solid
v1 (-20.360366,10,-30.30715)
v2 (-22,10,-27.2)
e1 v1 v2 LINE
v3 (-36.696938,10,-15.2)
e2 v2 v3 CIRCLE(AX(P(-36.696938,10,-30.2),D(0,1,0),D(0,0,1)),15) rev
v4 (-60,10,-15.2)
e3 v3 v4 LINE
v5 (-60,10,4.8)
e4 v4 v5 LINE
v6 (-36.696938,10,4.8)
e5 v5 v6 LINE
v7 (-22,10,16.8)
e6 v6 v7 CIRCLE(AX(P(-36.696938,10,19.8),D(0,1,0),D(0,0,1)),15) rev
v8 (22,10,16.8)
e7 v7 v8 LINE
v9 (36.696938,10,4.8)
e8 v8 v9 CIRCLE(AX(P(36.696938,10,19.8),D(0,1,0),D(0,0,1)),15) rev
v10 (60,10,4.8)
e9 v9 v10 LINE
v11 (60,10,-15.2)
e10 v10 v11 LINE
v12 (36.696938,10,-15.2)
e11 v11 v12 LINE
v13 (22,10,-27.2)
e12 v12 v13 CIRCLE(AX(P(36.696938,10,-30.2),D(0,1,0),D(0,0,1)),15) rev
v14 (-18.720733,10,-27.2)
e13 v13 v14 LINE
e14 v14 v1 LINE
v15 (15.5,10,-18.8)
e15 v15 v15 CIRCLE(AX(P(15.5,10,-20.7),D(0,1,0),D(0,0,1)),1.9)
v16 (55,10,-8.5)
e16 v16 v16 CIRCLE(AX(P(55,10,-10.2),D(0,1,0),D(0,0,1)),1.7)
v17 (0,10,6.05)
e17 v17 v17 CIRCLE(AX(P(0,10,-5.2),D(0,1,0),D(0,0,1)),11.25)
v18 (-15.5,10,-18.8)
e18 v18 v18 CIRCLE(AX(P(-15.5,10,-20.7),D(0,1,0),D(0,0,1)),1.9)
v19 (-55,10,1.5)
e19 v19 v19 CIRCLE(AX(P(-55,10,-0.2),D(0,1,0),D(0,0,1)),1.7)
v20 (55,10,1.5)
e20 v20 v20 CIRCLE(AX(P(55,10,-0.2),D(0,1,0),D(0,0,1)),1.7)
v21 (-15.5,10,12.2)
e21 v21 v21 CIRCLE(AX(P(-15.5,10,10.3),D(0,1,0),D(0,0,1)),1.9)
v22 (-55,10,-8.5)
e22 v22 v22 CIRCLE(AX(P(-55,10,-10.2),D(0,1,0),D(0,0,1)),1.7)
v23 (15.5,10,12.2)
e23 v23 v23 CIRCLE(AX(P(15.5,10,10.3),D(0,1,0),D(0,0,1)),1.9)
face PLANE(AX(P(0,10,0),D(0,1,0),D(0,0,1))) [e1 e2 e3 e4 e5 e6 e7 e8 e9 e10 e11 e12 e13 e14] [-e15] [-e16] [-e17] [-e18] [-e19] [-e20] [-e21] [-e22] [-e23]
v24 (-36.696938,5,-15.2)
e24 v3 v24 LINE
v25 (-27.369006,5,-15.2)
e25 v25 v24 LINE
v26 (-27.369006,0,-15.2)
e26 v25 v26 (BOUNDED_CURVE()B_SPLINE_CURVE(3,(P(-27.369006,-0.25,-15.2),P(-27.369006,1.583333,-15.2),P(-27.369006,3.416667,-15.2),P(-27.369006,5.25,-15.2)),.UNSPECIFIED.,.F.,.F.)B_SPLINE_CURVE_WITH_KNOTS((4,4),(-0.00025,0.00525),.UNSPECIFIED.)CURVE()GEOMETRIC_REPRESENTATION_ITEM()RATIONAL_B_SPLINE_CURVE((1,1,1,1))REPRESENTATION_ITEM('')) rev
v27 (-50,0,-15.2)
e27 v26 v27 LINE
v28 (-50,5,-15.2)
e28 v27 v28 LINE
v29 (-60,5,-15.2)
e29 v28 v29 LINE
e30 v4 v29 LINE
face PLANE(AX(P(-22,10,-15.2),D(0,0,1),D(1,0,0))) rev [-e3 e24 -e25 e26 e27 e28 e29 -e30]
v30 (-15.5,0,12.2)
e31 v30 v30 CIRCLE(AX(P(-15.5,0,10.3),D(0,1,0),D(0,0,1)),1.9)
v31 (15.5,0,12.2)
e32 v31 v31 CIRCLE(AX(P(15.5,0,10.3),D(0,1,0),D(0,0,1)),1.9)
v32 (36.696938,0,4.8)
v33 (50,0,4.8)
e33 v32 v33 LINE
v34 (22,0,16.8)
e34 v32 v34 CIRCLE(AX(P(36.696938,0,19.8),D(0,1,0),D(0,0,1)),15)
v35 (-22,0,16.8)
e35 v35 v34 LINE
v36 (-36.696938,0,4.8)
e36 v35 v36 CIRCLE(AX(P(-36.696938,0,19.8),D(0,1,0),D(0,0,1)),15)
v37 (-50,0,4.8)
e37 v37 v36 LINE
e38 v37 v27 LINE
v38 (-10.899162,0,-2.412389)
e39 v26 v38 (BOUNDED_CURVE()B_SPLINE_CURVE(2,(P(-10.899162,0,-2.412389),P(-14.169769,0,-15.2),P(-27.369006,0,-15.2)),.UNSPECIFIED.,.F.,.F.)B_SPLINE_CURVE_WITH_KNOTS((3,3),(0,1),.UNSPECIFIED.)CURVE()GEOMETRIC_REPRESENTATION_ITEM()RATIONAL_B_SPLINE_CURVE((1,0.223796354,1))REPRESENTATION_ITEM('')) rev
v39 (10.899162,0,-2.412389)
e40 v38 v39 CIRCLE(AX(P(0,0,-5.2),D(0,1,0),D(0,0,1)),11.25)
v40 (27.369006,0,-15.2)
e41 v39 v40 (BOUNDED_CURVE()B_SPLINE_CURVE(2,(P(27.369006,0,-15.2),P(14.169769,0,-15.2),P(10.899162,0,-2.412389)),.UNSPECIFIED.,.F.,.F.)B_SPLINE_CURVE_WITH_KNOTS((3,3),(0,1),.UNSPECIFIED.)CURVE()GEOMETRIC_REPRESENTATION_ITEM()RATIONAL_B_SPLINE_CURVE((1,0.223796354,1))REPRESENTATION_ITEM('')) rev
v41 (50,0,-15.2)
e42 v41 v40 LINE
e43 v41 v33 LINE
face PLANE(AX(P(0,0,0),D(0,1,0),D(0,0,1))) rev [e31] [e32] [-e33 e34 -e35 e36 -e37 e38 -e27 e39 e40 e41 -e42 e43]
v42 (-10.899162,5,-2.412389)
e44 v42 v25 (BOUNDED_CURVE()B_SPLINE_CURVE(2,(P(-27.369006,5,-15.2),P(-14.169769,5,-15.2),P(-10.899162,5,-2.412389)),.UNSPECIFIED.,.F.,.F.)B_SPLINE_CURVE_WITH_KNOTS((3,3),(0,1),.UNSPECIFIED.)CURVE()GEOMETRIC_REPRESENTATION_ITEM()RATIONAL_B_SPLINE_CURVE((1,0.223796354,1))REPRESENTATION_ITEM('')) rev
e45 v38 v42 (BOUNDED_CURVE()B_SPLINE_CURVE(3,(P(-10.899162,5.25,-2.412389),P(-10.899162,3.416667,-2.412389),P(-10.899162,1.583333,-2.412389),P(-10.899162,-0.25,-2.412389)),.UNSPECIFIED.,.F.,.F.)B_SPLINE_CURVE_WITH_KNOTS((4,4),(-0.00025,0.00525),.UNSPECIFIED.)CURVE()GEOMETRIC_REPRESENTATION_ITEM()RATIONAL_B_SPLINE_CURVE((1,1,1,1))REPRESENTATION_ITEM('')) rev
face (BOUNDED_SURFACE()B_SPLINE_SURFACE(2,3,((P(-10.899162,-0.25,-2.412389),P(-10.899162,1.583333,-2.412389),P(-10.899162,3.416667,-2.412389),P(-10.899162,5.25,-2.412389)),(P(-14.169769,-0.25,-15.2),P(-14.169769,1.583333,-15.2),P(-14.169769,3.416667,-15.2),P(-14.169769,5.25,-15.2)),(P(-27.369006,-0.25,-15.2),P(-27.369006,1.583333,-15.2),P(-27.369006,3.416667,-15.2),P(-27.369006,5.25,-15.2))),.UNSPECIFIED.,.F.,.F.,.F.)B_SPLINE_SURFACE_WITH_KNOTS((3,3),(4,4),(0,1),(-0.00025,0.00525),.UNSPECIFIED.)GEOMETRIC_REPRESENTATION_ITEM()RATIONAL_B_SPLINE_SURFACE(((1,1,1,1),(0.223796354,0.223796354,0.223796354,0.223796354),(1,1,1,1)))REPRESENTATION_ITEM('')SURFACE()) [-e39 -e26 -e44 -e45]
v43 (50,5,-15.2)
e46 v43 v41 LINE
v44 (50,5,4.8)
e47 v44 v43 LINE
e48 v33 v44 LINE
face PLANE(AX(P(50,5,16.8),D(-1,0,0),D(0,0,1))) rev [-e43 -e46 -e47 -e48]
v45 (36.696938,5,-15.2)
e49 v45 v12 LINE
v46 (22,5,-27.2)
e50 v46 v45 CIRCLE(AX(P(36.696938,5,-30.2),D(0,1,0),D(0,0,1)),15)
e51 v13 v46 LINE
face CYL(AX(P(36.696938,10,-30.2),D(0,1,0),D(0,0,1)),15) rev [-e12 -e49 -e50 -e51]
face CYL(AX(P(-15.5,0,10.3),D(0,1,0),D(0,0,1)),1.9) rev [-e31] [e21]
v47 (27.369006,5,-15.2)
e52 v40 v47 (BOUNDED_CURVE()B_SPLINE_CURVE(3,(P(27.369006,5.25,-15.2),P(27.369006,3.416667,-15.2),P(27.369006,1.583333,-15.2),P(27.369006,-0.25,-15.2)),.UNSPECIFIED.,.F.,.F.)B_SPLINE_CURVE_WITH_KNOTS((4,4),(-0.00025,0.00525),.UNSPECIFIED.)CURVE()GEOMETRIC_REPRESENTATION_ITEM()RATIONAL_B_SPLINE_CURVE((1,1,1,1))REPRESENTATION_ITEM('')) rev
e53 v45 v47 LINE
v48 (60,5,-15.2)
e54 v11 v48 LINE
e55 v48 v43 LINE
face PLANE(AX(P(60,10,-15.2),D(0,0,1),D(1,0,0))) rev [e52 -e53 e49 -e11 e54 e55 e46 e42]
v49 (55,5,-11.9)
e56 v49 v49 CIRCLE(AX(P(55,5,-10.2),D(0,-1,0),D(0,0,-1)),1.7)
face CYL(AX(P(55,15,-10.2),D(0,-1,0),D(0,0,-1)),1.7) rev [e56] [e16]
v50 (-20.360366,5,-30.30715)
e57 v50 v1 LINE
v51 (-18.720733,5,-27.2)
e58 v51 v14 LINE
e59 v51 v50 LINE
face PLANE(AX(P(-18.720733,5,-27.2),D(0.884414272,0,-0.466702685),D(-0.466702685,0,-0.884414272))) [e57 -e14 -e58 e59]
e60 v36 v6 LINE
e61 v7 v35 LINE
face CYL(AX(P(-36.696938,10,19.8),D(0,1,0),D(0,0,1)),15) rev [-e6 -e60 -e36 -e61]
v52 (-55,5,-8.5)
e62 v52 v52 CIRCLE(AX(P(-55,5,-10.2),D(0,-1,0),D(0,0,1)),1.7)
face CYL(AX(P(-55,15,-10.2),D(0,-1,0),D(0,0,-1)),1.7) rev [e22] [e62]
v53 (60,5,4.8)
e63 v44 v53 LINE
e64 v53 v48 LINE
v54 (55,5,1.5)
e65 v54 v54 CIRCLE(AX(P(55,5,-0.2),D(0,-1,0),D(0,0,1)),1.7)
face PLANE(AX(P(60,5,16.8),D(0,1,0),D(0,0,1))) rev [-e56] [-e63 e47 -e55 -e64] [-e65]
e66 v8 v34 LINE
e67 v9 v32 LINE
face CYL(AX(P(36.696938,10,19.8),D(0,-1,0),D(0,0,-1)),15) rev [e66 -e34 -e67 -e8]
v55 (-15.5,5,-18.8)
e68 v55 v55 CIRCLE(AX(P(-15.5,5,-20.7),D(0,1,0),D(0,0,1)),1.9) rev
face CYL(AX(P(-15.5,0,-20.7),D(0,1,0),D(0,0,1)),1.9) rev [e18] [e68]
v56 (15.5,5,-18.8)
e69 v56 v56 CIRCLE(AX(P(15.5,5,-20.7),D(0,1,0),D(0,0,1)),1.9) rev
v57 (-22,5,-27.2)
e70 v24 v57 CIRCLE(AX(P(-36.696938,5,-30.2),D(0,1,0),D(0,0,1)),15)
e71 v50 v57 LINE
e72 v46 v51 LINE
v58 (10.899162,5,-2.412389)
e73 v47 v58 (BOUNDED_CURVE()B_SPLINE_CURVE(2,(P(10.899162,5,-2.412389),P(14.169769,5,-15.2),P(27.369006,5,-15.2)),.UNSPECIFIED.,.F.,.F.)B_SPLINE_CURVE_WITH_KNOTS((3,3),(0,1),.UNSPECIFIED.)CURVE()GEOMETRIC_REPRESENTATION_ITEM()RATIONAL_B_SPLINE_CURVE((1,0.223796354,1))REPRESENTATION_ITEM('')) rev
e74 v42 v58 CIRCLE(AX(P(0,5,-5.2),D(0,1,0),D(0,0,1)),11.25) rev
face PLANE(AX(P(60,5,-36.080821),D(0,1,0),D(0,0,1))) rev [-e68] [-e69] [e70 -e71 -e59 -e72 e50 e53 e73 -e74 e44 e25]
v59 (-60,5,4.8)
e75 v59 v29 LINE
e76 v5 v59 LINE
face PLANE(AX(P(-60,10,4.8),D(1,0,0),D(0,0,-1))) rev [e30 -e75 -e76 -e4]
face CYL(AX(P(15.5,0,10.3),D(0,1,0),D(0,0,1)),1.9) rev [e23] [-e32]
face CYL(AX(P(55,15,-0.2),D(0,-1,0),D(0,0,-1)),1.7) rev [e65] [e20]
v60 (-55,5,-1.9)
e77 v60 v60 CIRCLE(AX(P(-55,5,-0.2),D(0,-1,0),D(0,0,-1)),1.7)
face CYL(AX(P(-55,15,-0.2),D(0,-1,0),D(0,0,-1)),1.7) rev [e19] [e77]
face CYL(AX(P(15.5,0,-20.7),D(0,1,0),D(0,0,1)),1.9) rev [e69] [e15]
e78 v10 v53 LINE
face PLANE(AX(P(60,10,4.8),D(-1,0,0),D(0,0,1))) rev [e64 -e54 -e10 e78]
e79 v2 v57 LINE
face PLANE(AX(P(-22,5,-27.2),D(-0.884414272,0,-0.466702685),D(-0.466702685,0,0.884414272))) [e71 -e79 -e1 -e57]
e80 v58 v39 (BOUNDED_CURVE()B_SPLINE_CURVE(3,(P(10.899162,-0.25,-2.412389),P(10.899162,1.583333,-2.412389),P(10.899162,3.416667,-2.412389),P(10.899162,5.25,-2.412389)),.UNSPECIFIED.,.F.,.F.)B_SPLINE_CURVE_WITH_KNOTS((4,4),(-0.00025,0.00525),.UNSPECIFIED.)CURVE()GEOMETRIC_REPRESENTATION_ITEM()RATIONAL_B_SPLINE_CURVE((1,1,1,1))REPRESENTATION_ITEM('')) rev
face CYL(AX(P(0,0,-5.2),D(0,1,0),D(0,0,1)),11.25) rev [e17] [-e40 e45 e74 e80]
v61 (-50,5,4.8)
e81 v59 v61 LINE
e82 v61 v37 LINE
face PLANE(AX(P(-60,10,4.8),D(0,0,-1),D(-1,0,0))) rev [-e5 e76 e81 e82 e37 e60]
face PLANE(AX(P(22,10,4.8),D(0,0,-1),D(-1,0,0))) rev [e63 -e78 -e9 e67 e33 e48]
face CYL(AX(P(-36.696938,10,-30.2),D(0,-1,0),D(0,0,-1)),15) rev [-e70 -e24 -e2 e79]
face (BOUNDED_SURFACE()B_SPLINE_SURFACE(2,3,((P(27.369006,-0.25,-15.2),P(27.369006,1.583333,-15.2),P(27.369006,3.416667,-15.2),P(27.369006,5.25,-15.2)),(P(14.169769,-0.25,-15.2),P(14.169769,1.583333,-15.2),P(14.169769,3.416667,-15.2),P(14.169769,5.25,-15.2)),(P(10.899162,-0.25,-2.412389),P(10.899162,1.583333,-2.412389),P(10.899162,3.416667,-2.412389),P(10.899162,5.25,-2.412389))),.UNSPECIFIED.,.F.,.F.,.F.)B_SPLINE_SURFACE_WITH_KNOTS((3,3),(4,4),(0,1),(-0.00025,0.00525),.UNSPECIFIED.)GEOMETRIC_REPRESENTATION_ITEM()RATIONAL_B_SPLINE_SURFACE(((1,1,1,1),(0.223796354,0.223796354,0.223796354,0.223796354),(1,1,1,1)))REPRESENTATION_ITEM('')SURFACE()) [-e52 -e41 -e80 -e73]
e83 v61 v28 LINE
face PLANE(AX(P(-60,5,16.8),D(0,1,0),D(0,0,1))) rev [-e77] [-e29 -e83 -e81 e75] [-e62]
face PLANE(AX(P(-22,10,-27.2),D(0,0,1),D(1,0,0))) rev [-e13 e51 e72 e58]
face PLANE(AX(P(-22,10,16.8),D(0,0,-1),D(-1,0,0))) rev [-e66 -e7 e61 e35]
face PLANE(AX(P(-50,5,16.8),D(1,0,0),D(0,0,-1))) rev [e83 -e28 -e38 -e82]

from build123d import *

# Parameters (mm, degrees)
AUFSATZ_LINEAR_AUSTRAGEN1_DEPTH      = 10
SKIZZE6_R                            = 1.9
SKIZZE6_R_2                          = 11.25
SCHNITT_LINEAR_AUSTRAGEN4_DEPTH      = 67.632124385
SKIZZE7_W                            = 20.880821379
SKIZZE7_H                            = 5
SCHNITT_LINEAR_AUSTRAGEN5_DEPTH      = 87.970339772
VERRUNDUNG3_R                        = 15
SCHNITT_LINEAR_AUSTRAGEN6_DEPTH      = 69.731361244
SCHNITT_LINEAR_AUSTRAGEN6_DEPTH_BACK = 69.731361244
SKIZZE8_W                            = 10
SKIZZE8_H                            = 5
SKIZZE9_R                            = 1.7
SCHNITT_LINEAR_AUSTRAGEN7_DEPTH      = 10
AUFSATZ_LINEAR_AUSTRAGEN2_DEPTH      = 5


with BuildPart() as part:
    # Skizze1 → Aufsatz-Linear austragen1 (new body)
    with BuildSketch(Plane(origin=(0, 0, 0), x_dir=(1, 0, 0), z_dir=(0, 1, 0))):
        Polygon((-60, -4.8), (-22, -4.8), (-22, -16.8), (22, -16.8), (22, -4.8), (60, -4.8), (60, 15.2), (22, 15.2), (22, 27.2), (0, 27.2), (-22, 27.2), (-22, 15.2), (-60, 15.2), align=None)
    extrude(amount=AUFSATZ_LINEAR_AUSTRAGEN1_DEPTH)

    # Skizze6 → Schnitt-Linear austragen4 (cut, through all)
    with BuildSketch(Plane(origin=(0, 10, 0), x_dir=(1, 0, 0), z_dir=(0, 1, 0))):
        with Locations(Location((15.5, 20.7, 0), (0, 0, 270))):
            Circle(SKIZZE6_R)
        with Locations(Location((15.5, -10.3, 0), (0, 0, 270))):
            Circle(SKIZZE6_R)
        with Locations(Location((-15.5, -10.3, 0), (0, 0, 270))):
            Circle(SKIZZE6_R)
        with Locations(Location((-15.5, 20.7, 0), (0, 0, 270))):
            Circle(SKIZZE6_R)
        with Locations(Location((0, 5.2, 0), (0, 0, 270))):
            Circle(SKIZZE6_R_2)
    extrude(amount=-SCHNITT_LINEAR_AUSTRAGEN4_DEPTH, mode=Mode.SUBTRACT)

    # Skizze7 → Schnitt-Linear austragen5 (cut, through all)
    with BuildSketch(Plane.ZY.offset(22)):
        with Locations((-25.64041069, 2.5)):
            Rectangle(SKIZZE7_W, SKIZZE7_H)
    extrude(amount=-SCHNITT_LINEAR_AUSTRAGEN5_DEPTH, mode=Mode.SUBTRACT)

    # Verrundung3
    # the kernel refuses this fillet: 15 mm, written as the material it adds along each edge
    with BuildSketch(Plane(origin=(-22, 5, -15.2), x_dir=(0, 0, -1), z_dir=(0, 1, 0))) as verrundung3_piece_1:
        with BuildLine():
            CenterArc((15, 14.696938457), VERRUNDUNG3_R, 180, 78.463040967)
            Line((0, 14.696938457), (-0.3, 14.696938457))
            Line((-0.3, 14.696938457), (-0.3, 0))
            Line((-0.3, 0), (0, -0.3))
            ThreePointArc((0, -0.3), (6, -0.3), (11.94, -0.293938769))
            Line((11.94, -0.293938769), (12, 0))
        make_face()
    extrude(amount=5)
    with BuildSketch(Plane(origin=(-22, 0, 4.8), x_dir=(-1, 0, 0), z_dir=(0, 1, 0))) as verrundung3_piece_2:
        with BuildLine():
            CenterArc((14.696938457, 15), VERRUNDUNG3_R, 191.536959033, 78.463040967)
            Line((0, 12), (-0.293938769, 11.94))
            ThreePointArc((-0.293938769, 11.94), (-0.3, 6), (-0.3, 0))
            Line((-0.3, 0), (0, -0.3))
            Line((0, -0.3), (14.696938457, -0.3))
            Line((14.696938457, -0.3), (14.696938457, 0))
        make_face()
    extrude(amount=10)
    with BuildSketch(Plane(origin=(22, 0, 4.8), x_dir=(1, 0, 0), z_dir=(0, 1, 0))) as verrundung3_piece_3:
        with BuildLine():
            CenterArc((14.696938457, -15), VERRUNDUNG3_R, 90, 78.463040967)
            Line((0, -12), (-0.293938769, -11.94))
            ThreePointArc((-0.293938769, -11.94), (-0.3, -6), (-0.3, 0))
            Line((-0.3, 0), (0, 0.3))
            Line((0, 0.3), (14.696938457, 0.3))
            Line((14.696938457, 0.3), (14.696938457, 0))
        make_face()
    extrude(amount=10)
    with BuildSketch(Plane(origin=(22, 5, -15.2), x_dir=(1, 0, 0), z_dir=(0, 1, 0))) as verrundung3_piece_4:
        with BuildLine():
            CenterArc((14.696938457, 15), VERRUNDUNG3_R, 191.536959033, 78.463040967)
            Line((0, 12), (-0.293938769, 11.94))
            ThreePointArc((-0.293938769, 11.94), (-0.3, 6), (-0.3, 0))
            Line((-0.3, 0), (0, -0.3))
            Line((0, -0.3), (14.696938457, -0.3))
            Line((14.696938457, -0.3), (14.696938457, 0))
        make_face()
    extrude(amount=5)

    # Verrundung4
    # a fillet whose section is not a circle: 17 mm, written as the material it takes off along each edge
    with BuildSketch(Plane(origin=(-5.153882032, -55.537810403, -15.2), x_dir=(-0.4098221227148323, 0, 0.912165460721633), z_dir=(0, 1, 0))) as verrundung4_piece_1:
        with BuildLine():
            Bezier((14.018959465, 0), (3.694910003, -8.223980839), (9.10424934, -20.263868965), weights=[1, 0.223796354, 1])
            Line((9.10424934, -20.263868965), (0, 0))
            ThreePointArc((0, 0), (7.009479733, -2.450585595), (14.018959465, 0))
        make_face()
    extrude(amount=60.537810403, mode=Mode.SUBTRACT)
    with BuildSketch(Plane(origin=(5.153882032, -55.537810403, -15.2), x_dir=(0.40982212271483137, 0, 0.9121654607216333), z_dir=(0, 1, 0))) as verrundung4_piece_2:
        with BuildLine():
            Bezier((14.018959465, 0), (3.694910003, 8.223980839), (9.10424934, 20.263868965), weights=[1, 0.223796354, 1])
            Line((9.10424934, 20.263868965), (0, 0))
            ThreePointArc((0, 0), (7.009479733, 2.450585595), (14.018959465, 0))
        make_face()
    extrude(amount=60.537810403, mode=Mode.SUBTRACT)

    # Skizze8 → Schnitt-Linear austragen6 (cut, two sides: drawn at the far end of the back side and taken through both)
    with BuildSketch(Plane(origin=(0, 0, -15.2), x_dir=(-1, 0, 0), z_dir=(0, 0, -1)).offset(-SCHNITT_LINEAR_AUSTRAGEN6_DEPTH_BACK)):
        with Locations((-55, 2.5)):
            Rectangle(SKIZZE8_W, SKIZZE8_H)
        with Locations((55, 2.5)):
            Rectangle(SKIZZE8_W, SKIZZE8_H)
    extrude(amount=SCHNITT_LINEAR_AUSTRAGEN6_DEPTH + SCHNITT_LINEAR_AUSTRAGEN6_DEPTH_BACK, mode=Mode.SUBTRACT)

    # Skizze9 → Schnitt-Linear austragen7 (cut)
    with BuildSketch(Plane.XZ.offset(-5)):
        with Locations(Location((-55, -0.2, 0), (0, 0, 270))):
            Circle(SKIZZE9_R)
        with Locations(Location((-55, -10.2, 0), (0, 0, 90))):
            Circle(SKIZZE9_R)
        with Locations(Location((55, -10.2, 0), (0, 0, 270))):
            Circle(SKIZZE9_R)
        with Locations(Location((55, -0.2, 0), (0, 0, 90))):
            Circle(SKIZZE9_R)
    extrude(amount=-SCHNITT_LINEAR_AUSTRAGEN7_DEPTH, mode=Mode.SUBTRACT)

    # Skizze10 → Aufsatz-Linear austragen2 (add)
    with BuildSketch(Plane(origin=(0, 10, 0), x_dir=(1, 0, 0), z_dir=(0, 1, 0))):
        Polygon((-22, 27.2), (-20.360366379, 30.307150274), (-18.720732758, 27.2), align=None)
    extrude(amount=-AUFSATZ_LINEAR_AUSTRAGEN2_DEPTH)


solid = part.part
